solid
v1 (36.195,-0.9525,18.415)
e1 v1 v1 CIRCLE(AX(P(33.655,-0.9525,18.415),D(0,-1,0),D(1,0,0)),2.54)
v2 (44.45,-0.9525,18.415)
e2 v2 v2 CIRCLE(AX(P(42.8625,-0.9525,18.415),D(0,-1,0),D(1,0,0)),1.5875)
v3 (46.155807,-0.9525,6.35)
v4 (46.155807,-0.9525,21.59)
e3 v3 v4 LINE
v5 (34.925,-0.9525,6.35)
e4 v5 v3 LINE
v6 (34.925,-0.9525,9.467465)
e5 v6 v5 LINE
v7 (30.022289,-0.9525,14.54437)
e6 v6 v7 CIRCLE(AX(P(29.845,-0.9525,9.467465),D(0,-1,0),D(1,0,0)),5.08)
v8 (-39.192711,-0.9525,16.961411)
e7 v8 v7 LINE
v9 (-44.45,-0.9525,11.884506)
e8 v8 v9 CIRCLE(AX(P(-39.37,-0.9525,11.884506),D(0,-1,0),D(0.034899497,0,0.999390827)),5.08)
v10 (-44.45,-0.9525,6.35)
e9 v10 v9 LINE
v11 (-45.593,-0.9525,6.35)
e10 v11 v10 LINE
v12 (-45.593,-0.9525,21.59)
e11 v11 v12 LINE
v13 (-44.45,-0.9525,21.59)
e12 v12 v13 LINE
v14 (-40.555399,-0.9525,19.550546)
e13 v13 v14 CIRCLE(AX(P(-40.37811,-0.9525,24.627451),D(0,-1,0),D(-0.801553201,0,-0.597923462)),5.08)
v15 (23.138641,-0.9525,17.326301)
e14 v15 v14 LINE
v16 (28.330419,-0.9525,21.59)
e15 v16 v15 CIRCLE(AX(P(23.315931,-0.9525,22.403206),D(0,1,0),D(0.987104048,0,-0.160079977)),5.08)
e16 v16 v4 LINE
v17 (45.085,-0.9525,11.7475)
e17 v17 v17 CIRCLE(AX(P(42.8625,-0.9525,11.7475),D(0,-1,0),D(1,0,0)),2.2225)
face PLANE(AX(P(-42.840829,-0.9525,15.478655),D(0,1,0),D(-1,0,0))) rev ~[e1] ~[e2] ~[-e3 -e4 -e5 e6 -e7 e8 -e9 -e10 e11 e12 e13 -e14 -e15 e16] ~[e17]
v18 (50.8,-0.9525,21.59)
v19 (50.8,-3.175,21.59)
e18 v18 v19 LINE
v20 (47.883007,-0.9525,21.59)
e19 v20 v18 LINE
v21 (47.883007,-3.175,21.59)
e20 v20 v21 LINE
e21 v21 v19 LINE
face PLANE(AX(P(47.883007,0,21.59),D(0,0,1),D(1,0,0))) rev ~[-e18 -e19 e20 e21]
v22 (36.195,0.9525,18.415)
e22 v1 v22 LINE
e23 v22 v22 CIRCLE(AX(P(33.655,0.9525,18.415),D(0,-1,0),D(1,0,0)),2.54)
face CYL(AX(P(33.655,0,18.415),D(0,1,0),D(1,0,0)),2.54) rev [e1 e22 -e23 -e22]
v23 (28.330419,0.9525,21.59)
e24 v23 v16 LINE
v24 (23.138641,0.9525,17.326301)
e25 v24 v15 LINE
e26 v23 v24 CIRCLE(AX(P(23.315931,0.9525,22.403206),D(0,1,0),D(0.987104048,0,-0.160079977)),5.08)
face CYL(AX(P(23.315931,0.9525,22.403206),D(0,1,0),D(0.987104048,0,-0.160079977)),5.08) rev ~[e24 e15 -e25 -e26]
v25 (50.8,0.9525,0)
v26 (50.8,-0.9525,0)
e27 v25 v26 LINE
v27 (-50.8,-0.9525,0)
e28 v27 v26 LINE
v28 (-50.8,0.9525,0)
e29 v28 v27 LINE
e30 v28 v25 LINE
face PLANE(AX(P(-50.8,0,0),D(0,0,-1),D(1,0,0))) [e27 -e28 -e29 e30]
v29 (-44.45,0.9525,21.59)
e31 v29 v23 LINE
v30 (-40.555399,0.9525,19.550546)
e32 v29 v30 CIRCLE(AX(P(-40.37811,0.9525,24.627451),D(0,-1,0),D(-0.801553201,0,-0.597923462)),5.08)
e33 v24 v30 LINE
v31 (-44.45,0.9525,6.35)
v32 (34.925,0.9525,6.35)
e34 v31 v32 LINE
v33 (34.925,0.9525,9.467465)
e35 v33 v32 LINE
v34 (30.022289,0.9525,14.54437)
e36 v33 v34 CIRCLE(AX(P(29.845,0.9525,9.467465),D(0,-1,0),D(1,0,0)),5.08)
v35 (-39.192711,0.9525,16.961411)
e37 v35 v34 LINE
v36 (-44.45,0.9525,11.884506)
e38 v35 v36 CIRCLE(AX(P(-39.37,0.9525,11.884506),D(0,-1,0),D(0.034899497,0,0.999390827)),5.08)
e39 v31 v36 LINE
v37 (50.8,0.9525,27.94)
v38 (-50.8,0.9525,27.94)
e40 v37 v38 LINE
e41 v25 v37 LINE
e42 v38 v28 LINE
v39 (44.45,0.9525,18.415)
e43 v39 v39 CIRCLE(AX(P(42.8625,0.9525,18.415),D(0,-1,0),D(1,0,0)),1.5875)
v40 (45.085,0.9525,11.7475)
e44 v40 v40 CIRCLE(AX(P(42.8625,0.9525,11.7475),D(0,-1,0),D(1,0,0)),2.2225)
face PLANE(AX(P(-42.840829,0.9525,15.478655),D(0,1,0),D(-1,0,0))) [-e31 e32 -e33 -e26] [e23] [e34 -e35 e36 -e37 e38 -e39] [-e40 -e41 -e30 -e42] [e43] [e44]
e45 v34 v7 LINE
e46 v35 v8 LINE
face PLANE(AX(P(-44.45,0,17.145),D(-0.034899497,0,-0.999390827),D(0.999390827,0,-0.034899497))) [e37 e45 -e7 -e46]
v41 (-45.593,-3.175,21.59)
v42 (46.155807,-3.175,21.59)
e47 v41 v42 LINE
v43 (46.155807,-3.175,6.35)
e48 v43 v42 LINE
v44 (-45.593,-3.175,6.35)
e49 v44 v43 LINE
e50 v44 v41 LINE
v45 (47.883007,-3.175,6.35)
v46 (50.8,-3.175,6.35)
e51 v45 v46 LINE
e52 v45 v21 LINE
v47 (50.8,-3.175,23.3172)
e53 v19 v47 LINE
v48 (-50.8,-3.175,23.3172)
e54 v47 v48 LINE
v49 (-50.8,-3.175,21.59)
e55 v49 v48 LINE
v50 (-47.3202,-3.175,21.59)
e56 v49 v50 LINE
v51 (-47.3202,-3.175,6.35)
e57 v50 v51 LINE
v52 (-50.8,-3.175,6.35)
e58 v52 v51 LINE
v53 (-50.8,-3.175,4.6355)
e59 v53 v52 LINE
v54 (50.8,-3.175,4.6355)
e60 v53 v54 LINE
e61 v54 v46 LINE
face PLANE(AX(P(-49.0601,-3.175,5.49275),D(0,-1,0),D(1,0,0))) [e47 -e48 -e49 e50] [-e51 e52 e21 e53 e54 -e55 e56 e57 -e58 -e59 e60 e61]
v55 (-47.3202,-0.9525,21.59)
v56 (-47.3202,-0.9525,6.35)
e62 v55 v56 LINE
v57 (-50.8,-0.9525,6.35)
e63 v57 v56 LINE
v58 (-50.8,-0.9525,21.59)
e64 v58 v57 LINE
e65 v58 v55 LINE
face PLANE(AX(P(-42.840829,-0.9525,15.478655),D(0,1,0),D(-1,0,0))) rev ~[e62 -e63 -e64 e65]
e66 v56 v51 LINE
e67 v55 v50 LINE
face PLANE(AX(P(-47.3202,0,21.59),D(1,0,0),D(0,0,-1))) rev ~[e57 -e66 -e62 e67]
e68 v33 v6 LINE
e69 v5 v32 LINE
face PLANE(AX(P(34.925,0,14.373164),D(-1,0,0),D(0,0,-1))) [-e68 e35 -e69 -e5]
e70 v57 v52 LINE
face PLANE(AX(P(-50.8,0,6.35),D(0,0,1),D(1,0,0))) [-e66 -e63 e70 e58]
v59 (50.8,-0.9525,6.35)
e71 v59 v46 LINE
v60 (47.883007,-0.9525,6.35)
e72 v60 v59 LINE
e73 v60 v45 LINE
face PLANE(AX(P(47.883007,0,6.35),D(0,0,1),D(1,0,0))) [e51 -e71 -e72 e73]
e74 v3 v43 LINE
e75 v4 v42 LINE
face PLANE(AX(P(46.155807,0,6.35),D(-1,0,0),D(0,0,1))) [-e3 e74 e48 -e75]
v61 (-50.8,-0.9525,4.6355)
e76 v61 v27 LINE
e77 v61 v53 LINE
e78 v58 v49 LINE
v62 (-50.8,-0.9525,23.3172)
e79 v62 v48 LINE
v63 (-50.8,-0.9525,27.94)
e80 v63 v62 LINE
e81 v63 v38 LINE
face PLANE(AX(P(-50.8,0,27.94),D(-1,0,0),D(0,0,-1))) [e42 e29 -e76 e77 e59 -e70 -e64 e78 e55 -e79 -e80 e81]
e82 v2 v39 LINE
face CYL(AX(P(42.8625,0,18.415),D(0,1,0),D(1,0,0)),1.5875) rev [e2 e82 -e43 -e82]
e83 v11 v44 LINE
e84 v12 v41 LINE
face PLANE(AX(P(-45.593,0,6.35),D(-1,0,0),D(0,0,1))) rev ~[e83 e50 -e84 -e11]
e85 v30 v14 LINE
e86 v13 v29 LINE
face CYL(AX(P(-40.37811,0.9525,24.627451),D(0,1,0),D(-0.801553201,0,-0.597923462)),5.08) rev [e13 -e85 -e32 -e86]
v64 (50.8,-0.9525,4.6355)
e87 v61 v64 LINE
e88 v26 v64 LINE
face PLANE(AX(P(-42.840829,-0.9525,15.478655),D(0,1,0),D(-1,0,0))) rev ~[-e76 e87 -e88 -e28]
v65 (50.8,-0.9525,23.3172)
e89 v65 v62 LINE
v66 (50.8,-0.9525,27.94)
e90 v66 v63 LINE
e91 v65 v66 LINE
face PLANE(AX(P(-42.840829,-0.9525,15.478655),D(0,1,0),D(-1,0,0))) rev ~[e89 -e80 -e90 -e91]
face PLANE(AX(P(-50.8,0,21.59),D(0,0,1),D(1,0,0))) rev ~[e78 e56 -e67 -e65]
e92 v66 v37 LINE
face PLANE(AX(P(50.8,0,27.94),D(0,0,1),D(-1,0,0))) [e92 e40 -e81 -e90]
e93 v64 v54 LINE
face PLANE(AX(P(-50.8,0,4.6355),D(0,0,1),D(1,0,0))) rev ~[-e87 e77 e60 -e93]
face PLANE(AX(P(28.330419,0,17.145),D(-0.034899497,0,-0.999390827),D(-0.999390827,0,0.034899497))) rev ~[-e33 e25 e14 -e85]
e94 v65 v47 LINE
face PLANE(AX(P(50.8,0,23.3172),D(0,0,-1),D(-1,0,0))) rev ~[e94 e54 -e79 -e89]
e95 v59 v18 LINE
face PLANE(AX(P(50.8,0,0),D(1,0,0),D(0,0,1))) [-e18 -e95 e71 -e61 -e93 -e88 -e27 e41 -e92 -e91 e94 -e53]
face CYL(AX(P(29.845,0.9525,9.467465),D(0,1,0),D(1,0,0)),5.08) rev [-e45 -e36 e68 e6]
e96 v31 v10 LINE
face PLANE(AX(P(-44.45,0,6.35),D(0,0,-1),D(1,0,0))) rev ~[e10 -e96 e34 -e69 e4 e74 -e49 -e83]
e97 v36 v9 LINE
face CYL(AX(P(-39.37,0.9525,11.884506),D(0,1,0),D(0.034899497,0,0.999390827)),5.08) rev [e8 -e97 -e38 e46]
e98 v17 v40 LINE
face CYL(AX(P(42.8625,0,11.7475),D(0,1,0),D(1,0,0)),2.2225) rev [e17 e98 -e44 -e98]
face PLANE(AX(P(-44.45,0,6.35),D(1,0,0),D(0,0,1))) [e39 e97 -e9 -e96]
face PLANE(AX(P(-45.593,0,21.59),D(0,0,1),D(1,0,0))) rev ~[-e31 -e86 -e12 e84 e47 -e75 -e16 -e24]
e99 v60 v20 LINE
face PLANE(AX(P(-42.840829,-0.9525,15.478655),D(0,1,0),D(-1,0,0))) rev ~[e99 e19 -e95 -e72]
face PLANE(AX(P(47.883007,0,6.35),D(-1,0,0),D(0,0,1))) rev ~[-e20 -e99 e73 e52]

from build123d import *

# Parameters (mm, degrees)
F0_R        = 2.2225
F0_R_2      = 2.54
F0_R_3      = 1.5875
F0_W        = 79.375
F0_H        = 6.35
F1_DEPTH    = 0.9525
F2_T1_DEPTH = 1.905
F3_W        = 3.4798
F3_H        = 1.7145
F3_W_2      = 1.7272
F3_H_2      = 15.24
F3_W_3      = 91.7488066308
F3_H_3      = 1.7272
F3_W_4      = 2.9169933692
F4_DEPTH    = 3.175


# Not quite as in the source:
# - a fillet or chamfer that OpenCascade refuses, or shapes differently, is made with other operations: its cross-section is extruded or revolved along the edge and cut away or added
# - a feature names something its author has since deleted; it is built from what else it names


with BuildPart() as f1:
    # F0 (on Front) → F1 (new body, symmetric)
    with BuildSketch(Plane.XZ):
        Polygon((-50.8, 27.94), (-50.8, 0), (-44.45, 0), (-44.45, 6.35), (-44.45, 17.145), (34.925, 14.3731639216), (34.925, 6.35), (34.925, 0), (50.8, 0), (50.8, 27.94), align=None)
        with Locations((42.8625, 11.7475)):
            Circle(F0_R, mode=Mode.SUBTRACT)
        Polygon((-44.45, 21.59), (28.3304192035, 21.59), (28.3304192035, 17.145), (-44.45, 19.6865482425), align=None, mode=Mode.SUBTRACT)
        with Locations((33.655, 18.415)):
            Circle(F0_R_2, mode=Mode.SUBTRACT)
        with Locations((42.8625, 18.415)):
            Circle(F0_R_3, mode=Mode.SUBTRACT)
        with Locations((-4.7625, 3.175)):
            Rectangle(F0_W, F0_H)
    extrude(amount=F1_DEPTH, both=True)

    # F2: fillet of radius 5.08 on 4 edges, made by hand

    # F2_s2 → F2_t1 (join)
    with BuildSketch(Plane.XZ.offset(-0.9525)):
        with BuildLine():
            ThreePointArc((-39.1927105568, 16.9614114072), (-42.8988645219, 15.5387521917), (-44.45, 11.8845060059))
            Line((-44.45, 11.8845060059), (-44.45, 17.145))
            Line((-44.45, 17.145), (-39.1927105568, 16.9614114072))
        make_face()
        with BuildLine():
            ThreePointArc((34.925, 9.4674649456), (33.4992461857, 12.9963294675), (30.0222894432, 14.5443703468))
            Line((30.0222894432, 14.5443703468), (34.925, 14.3731639216))
            Line((34.925, 14.3731639216), (34.925, 9.4674649456))
        make_face()
        with BuildLine():
            ThreePointArc((-44.45, 21.59), (-42.7347440797, 20.1271540197), (-40.5553991831, 19.5505457851))
            Line((-40.5553991831, 19.5505457851), (-44.45, 19.6865482425))
            Line((-44.45, 19.6865482425), (-44.45, 21.59))
        make_face()
        with BuildLine():
            ThreePointArc((28.3304192035, 21.59), (26.5399663684, 18.4773950775), (23.1386411982, 17.326300883))
            Line((23.1386411982, 17.326300883), (28.3304192035, 17.145))
            Line((28.3304192035, 17.145), (28.3304192035, 21.59))
        make_face()
    extrude(amount=F2_T1_DEPTH)

    # F3 (on Front) → F4 (join)
    with BuildSketch(Plane.XZ):
        with Locations((-49.0601, 5.49275)):
            Rectangle(F3_W, F3_H)
        with Locations((-46.4566, 13.97)):
            Rectangle(F3_W_2, F3_H_2)
        with Locations((-46.4566, 5.49275)):
            Rectangle(F3_W_2, F3_H)
        with Locations((0.2814033154, 5.49275)):
            Rectangle(F3_W_3, F3_H)
        with Locations((-46.4566, 22.4536)):
            Rectangle(F3_W_2, F3_H_3)
        with Locations((-49.0601, 22.4536)):
            Rectangle(F3_W, F3_H_3)
        with Locations((47.0194066308, 13.97)):
            Rectangle(F3_W_2, F3_H_2)
        with Locations((47.0194066308, 5.49275)):
            Rectangle(F3_W_2, F3_H)
        with Locations((0.2814033154, 22.4536)):
            Rectangle(F3_W_3, F3_H_3)
        with Locations((49.3415033154, 5.49275)):
            Rectangle(F3_W_4, F3_H)
        with Locations((47.0194066308, 22.4536)):
            Rectangle(F3_W_2, F3_H_3)
        with Locations((49.3415033154, 22.4536)):
            Rectangle(F3_W_4, F3_H_3)
    extrude(amount=F4_DEPTH)


solid = f1.part
